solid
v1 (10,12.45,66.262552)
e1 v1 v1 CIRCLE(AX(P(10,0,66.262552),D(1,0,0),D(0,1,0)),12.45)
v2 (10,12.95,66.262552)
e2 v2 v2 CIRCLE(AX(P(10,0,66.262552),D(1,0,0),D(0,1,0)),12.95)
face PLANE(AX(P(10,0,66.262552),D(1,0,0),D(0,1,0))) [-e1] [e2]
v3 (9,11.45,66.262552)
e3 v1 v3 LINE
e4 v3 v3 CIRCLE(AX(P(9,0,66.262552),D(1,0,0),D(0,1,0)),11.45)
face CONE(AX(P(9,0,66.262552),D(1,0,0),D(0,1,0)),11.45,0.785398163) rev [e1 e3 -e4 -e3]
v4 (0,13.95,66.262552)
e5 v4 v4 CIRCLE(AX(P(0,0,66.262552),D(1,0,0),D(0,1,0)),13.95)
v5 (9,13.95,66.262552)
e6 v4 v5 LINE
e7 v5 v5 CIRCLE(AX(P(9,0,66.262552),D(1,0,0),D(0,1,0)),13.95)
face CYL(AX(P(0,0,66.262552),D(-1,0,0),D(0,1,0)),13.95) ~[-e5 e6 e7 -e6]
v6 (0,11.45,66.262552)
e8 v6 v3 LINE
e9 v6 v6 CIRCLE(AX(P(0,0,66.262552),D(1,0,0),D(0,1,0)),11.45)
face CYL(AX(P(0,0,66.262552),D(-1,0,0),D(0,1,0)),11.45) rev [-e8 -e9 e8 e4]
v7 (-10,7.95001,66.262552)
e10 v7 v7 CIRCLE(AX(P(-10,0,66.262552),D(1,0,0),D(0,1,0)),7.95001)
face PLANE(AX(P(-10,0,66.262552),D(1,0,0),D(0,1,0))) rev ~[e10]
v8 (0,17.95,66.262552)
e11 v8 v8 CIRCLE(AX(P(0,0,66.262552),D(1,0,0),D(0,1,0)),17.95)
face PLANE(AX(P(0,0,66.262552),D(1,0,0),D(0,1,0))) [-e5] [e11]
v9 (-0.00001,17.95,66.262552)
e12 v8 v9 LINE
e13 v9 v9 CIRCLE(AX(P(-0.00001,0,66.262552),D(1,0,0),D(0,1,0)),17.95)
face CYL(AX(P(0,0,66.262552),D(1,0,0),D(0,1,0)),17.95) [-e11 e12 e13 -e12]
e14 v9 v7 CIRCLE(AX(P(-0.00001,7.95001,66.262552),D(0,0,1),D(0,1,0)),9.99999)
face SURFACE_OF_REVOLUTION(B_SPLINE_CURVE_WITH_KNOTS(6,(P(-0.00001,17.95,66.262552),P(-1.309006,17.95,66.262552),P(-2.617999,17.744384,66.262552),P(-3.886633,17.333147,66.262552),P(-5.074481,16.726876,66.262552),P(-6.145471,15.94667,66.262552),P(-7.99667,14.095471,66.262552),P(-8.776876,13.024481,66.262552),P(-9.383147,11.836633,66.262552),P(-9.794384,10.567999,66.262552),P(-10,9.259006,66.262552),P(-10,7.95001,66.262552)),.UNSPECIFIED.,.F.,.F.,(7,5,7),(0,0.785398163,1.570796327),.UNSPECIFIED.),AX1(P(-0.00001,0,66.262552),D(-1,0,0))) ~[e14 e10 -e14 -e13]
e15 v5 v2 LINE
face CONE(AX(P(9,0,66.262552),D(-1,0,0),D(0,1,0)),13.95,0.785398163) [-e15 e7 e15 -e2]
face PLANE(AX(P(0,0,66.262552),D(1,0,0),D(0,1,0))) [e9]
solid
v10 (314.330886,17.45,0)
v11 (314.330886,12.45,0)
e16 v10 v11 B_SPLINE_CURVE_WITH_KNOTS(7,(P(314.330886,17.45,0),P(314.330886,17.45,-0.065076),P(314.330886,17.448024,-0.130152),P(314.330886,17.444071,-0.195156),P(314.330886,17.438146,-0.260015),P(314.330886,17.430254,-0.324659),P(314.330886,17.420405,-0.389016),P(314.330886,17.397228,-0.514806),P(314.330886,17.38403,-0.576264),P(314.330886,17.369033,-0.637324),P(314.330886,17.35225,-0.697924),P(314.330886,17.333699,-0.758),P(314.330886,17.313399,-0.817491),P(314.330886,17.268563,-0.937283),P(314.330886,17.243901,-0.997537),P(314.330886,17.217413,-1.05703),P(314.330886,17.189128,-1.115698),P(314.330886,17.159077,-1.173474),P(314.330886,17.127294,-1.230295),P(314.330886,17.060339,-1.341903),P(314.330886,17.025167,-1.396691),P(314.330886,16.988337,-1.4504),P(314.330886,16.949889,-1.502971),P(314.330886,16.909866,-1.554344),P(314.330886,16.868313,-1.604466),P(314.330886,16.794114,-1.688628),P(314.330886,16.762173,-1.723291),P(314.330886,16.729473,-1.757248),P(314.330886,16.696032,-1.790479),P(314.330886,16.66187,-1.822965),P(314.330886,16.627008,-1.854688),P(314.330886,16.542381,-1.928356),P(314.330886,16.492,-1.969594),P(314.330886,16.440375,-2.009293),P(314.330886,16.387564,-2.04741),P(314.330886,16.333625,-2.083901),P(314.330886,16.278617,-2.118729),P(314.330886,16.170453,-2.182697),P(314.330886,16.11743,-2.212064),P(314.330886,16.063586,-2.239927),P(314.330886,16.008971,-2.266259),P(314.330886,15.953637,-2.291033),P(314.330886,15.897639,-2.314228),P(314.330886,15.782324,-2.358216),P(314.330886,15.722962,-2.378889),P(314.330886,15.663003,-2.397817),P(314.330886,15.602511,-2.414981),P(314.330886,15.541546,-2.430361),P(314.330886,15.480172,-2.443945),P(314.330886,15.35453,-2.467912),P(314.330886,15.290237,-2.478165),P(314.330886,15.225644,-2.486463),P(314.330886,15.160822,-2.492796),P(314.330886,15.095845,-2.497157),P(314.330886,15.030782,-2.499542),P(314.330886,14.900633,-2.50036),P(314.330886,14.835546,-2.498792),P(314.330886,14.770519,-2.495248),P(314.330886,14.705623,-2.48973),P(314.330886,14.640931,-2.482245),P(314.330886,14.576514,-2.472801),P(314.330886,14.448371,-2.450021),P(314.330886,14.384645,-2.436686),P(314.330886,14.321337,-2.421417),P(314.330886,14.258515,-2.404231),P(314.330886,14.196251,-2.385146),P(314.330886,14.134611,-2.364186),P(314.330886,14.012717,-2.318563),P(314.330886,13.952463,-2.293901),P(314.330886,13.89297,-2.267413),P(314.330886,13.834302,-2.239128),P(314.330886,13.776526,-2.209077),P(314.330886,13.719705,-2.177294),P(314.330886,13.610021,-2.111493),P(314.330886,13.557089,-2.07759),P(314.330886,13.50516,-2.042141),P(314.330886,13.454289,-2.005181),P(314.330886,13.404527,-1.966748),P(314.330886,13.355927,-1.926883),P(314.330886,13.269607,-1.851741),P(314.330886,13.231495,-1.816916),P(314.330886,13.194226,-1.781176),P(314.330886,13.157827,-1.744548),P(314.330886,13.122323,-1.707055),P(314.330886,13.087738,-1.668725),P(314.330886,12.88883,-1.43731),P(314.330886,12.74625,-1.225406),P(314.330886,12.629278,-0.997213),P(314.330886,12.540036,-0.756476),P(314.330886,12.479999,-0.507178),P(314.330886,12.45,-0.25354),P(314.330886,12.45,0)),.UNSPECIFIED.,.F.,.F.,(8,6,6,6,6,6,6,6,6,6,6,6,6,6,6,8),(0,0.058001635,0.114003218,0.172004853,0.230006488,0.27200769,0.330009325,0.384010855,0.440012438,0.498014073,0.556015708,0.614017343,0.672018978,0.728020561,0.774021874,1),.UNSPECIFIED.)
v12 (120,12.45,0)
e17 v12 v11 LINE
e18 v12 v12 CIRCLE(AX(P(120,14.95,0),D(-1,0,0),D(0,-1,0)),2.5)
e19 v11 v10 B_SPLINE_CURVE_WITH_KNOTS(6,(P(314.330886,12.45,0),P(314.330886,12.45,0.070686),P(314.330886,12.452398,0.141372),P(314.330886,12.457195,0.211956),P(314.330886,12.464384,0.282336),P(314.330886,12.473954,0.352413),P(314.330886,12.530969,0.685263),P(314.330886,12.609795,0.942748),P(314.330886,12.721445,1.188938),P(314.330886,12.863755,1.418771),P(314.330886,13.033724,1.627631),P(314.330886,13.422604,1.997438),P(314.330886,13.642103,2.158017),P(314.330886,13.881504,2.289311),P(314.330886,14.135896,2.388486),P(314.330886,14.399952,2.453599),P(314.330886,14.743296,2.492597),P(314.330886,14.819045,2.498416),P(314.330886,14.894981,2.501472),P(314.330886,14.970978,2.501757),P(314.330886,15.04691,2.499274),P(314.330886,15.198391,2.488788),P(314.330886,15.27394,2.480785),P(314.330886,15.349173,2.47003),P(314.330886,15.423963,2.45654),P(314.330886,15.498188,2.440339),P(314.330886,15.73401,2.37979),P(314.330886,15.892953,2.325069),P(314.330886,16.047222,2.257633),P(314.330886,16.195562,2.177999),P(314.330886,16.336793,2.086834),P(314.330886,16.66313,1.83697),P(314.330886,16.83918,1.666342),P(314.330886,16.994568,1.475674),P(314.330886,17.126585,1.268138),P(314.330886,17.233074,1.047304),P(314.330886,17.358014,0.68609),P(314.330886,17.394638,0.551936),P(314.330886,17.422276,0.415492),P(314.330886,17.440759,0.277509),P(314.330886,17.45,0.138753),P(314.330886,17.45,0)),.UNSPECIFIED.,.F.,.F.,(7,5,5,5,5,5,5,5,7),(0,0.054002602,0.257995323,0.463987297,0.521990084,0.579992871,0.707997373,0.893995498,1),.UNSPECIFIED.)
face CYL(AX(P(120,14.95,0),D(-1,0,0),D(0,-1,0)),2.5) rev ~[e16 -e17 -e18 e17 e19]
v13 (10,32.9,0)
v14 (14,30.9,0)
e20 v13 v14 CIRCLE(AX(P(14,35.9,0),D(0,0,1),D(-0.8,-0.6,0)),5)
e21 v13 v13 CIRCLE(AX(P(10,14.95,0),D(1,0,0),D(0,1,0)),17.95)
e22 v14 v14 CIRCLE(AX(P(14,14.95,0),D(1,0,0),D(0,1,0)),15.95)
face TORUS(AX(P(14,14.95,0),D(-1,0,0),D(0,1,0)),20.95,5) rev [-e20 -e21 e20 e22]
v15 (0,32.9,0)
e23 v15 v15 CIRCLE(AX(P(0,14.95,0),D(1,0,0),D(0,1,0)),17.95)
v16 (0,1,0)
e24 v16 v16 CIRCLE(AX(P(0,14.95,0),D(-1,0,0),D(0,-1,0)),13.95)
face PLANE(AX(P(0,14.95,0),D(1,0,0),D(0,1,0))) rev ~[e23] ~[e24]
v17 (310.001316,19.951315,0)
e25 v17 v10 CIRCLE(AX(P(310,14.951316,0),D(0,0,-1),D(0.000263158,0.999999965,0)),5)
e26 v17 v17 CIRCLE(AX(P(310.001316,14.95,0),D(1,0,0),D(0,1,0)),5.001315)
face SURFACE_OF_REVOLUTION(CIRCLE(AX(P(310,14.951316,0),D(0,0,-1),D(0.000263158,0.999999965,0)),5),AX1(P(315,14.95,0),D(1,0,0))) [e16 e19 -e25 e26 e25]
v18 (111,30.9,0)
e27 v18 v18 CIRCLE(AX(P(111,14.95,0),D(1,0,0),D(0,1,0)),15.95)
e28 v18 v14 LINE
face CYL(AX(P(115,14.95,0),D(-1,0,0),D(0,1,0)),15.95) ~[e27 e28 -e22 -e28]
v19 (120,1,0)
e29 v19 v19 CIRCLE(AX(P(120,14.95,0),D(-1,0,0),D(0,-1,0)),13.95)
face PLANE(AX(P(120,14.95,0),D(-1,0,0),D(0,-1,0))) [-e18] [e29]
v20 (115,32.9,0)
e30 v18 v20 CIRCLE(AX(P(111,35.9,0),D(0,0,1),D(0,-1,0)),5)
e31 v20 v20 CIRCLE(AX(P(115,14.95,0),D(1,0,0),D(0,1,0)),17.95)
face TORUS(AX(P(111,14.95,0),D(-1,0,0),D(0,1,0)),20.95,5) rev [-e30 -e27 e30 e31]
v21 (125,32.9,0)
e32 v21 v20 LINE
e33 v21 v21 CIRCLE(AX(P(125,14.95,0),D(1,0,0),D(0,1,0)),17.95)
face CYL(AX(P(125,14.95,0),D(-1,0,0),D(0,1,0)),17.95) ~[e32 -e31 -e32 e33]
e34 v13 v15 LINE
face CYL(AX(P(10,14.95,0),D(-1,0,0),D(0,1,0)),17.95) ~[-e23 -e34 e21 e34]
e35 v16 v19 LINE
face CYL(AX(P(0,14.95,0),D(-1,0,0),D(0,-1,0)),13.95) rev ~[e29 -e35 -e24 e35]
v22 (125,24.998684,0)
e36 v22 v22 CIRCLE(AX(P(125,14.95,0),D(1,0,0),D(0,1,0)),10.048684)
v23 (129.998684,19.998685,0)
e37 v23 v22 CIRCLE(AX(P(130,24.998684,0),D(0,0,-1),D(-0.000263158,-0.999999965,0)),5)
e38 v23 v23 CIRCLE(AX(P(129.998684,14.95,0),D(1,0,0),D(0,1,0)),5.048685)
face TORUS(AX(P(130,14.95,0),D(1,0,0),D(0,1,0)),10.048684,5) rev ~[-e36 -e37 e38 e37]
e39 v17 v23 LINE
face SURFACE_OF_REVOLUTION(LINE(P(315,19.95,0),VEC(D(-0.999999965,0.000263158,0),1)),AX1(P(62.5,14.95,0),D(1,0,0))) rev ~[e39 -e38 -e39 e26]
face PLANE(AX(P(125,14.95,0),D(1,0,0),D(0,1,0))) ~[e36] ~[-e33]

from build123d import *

# Parameters (mm, degrees)
F3_R      = 13.95
F4_DEPTH  = 120
F5_R      = 17.95
F6_DEPTH  = 10
F7_R      = 13.95
F7_R_2    = 11.45
F8_DEPTH  = 10
F9_SIZE   = 1
F10_R     = 9.99999
F11_R     = 2.5
F12_DEPTH = 195.0010001


# Not quite as in the source:
# - a fillet or chamfer that OpenCascade refuses, or shapes differently, is made with other operations: its cross-section is extruded or revolved along the edge and cut away or added
# - a fillet or chamfer is up to 0.001 mm smaller than in the source, because OpenCascade refuses the exact size


with BuildPart() as f1:
    # F0 (on Top) → F1 (revolve)
    with BuildSketch(Plane.XY):
        Polygon((10, 32.9), (0, 32.9), (0, 14.95), (125, 14.95), (315, 14.95), (315, 19.95), (125, 20), (125, 32.9), (115, 32.9), (115, 30.9), (10, 30.9), align=None)
    revolve(axis=Axis((62.5, 14.95, 0), (1, 0, 0)))

    # F2: fillet of radius 5 on 6 edges, made by hand

    # F2_s1 → F2_t2 (revolve)
    with BuildSketch(Plane.XY):
        with BuildLine():
            ThreePointArc((129.9986842106, 19.9986845568), (126.4640009229, 21.4636157101), (125, 24.9986843837))
            Line((125, 24.9986843837), (125, 20))
            Line((125, 20), (129.9986842106, 19.9986845568))
        make_face()
    revolve(axis=Axis((125, 14.95, 0), (1, 0, 0)))

    # F2_s3 → F2_t4 (revolve)
    with BuildSketch(Plane.XY):
        with BuildLine():
            ThreePointArc((111, 30.9), (113.2360679775, 31.427864045), (115, 32.9))
            Line((115, 32.9), (115, 30.9))
            Line((115, 30.9), (111, 30.9))
        make_face()
    revolve(axis=Axis((115, 14.95, 0), (1, 0, 0)))

    # F2_s5 → F2_t6 (revolve)
    with BuildSketch(Plane.XY):
        with BuildLine():
            ThreePointArc((10, 32.9), (11.7639320225, 31.427864045), (14, 30.9))
            Line((14, 30.9), (10, 30.9))
            Line((10, 30.9), (10, 32.9))
        make_face()
    revolve(axis=Axis((10, 14.95, 0), (1, 0, 0)))

    # F2_s7 → F2_t8 (revolve, cut)
    with BuildSketch(Plane.XY):
        with BuildLine():
            ThreePointArc((310.0013157894, 19.9513154432), (313.5359990771, 18.4863842899), (315, 14.9513156163))
            Line((315, 14.9513156163), (315, 19.95))
            Line((315, 19.95), (310.0013157894, 19.9513154432))
        make_face()
    revolve(axis=Axis((315, 14.95, 0), (1, 0, 0)), mode=Mode.SUBTRACT)

    # F3 (on face) → F4 (cut)
    with BuildSketch(Plane(origin=(0, 0, 0), x_dir=(0, -1, 0), z_dir=(-1, 0, 0))):
        with Locations((-14.95, 0)):
            Circle(F3_R)
    extrude(amount=-F4_DEPTH, mode=Mode.SUBTRACT)

    # F11 (on face) → F12 (cut, through all)
    with BuildSketch(Plane(origin=(120, 0, 0), x_dir=(0, -1, 0), z_dir=(-1, 0, 0))):
        with Locations((-14.95, 0)):
            Circle(F11_R)
    extrude(amount=-F12_DEPTH, mode=Mode.SUBTRACT)


with BuildPart() as f6:
    # F5 (on Right) → F6 (new body)
    with BuildSketch(Plane.YZ):
        with Locations((0, 66.2625518771)):
            Circle(F5_R)
    extrude(amount=-F6_DEPTH)

    # F7 (on face) → F8 (join)
    with BuildSketch(Plane.YZ):
        with Locations((0, 66.2625518771)):
            Circle(F7_R)
        with Locations((0, 66.2625518771)):
            Circle(F7_R_2, mode=Mode.SUBTRACT)
    extrude(amount=F8_DEPTH)

    # F9
    f9_edges = [f6.edges().sort_by_distance(p)[0] for p in [
        (10, -13.95, 66.262552),
        (10, -11.45, 66.262552),
    ]]
    chamfer(f9_edges, length=F9_SIZE)

    # F10 (radius 10 in the source; OpenCascade refuses exactly that, so slightly less here)
    f10_edges = [f6.edges().sort_by_distance(p)[0] for p in [
        (-10, -17.95, 66.262552),
    ]]
    fillet(f10_edges, radius=F10_R)


solid = Compound([f1.part, f6.part])
